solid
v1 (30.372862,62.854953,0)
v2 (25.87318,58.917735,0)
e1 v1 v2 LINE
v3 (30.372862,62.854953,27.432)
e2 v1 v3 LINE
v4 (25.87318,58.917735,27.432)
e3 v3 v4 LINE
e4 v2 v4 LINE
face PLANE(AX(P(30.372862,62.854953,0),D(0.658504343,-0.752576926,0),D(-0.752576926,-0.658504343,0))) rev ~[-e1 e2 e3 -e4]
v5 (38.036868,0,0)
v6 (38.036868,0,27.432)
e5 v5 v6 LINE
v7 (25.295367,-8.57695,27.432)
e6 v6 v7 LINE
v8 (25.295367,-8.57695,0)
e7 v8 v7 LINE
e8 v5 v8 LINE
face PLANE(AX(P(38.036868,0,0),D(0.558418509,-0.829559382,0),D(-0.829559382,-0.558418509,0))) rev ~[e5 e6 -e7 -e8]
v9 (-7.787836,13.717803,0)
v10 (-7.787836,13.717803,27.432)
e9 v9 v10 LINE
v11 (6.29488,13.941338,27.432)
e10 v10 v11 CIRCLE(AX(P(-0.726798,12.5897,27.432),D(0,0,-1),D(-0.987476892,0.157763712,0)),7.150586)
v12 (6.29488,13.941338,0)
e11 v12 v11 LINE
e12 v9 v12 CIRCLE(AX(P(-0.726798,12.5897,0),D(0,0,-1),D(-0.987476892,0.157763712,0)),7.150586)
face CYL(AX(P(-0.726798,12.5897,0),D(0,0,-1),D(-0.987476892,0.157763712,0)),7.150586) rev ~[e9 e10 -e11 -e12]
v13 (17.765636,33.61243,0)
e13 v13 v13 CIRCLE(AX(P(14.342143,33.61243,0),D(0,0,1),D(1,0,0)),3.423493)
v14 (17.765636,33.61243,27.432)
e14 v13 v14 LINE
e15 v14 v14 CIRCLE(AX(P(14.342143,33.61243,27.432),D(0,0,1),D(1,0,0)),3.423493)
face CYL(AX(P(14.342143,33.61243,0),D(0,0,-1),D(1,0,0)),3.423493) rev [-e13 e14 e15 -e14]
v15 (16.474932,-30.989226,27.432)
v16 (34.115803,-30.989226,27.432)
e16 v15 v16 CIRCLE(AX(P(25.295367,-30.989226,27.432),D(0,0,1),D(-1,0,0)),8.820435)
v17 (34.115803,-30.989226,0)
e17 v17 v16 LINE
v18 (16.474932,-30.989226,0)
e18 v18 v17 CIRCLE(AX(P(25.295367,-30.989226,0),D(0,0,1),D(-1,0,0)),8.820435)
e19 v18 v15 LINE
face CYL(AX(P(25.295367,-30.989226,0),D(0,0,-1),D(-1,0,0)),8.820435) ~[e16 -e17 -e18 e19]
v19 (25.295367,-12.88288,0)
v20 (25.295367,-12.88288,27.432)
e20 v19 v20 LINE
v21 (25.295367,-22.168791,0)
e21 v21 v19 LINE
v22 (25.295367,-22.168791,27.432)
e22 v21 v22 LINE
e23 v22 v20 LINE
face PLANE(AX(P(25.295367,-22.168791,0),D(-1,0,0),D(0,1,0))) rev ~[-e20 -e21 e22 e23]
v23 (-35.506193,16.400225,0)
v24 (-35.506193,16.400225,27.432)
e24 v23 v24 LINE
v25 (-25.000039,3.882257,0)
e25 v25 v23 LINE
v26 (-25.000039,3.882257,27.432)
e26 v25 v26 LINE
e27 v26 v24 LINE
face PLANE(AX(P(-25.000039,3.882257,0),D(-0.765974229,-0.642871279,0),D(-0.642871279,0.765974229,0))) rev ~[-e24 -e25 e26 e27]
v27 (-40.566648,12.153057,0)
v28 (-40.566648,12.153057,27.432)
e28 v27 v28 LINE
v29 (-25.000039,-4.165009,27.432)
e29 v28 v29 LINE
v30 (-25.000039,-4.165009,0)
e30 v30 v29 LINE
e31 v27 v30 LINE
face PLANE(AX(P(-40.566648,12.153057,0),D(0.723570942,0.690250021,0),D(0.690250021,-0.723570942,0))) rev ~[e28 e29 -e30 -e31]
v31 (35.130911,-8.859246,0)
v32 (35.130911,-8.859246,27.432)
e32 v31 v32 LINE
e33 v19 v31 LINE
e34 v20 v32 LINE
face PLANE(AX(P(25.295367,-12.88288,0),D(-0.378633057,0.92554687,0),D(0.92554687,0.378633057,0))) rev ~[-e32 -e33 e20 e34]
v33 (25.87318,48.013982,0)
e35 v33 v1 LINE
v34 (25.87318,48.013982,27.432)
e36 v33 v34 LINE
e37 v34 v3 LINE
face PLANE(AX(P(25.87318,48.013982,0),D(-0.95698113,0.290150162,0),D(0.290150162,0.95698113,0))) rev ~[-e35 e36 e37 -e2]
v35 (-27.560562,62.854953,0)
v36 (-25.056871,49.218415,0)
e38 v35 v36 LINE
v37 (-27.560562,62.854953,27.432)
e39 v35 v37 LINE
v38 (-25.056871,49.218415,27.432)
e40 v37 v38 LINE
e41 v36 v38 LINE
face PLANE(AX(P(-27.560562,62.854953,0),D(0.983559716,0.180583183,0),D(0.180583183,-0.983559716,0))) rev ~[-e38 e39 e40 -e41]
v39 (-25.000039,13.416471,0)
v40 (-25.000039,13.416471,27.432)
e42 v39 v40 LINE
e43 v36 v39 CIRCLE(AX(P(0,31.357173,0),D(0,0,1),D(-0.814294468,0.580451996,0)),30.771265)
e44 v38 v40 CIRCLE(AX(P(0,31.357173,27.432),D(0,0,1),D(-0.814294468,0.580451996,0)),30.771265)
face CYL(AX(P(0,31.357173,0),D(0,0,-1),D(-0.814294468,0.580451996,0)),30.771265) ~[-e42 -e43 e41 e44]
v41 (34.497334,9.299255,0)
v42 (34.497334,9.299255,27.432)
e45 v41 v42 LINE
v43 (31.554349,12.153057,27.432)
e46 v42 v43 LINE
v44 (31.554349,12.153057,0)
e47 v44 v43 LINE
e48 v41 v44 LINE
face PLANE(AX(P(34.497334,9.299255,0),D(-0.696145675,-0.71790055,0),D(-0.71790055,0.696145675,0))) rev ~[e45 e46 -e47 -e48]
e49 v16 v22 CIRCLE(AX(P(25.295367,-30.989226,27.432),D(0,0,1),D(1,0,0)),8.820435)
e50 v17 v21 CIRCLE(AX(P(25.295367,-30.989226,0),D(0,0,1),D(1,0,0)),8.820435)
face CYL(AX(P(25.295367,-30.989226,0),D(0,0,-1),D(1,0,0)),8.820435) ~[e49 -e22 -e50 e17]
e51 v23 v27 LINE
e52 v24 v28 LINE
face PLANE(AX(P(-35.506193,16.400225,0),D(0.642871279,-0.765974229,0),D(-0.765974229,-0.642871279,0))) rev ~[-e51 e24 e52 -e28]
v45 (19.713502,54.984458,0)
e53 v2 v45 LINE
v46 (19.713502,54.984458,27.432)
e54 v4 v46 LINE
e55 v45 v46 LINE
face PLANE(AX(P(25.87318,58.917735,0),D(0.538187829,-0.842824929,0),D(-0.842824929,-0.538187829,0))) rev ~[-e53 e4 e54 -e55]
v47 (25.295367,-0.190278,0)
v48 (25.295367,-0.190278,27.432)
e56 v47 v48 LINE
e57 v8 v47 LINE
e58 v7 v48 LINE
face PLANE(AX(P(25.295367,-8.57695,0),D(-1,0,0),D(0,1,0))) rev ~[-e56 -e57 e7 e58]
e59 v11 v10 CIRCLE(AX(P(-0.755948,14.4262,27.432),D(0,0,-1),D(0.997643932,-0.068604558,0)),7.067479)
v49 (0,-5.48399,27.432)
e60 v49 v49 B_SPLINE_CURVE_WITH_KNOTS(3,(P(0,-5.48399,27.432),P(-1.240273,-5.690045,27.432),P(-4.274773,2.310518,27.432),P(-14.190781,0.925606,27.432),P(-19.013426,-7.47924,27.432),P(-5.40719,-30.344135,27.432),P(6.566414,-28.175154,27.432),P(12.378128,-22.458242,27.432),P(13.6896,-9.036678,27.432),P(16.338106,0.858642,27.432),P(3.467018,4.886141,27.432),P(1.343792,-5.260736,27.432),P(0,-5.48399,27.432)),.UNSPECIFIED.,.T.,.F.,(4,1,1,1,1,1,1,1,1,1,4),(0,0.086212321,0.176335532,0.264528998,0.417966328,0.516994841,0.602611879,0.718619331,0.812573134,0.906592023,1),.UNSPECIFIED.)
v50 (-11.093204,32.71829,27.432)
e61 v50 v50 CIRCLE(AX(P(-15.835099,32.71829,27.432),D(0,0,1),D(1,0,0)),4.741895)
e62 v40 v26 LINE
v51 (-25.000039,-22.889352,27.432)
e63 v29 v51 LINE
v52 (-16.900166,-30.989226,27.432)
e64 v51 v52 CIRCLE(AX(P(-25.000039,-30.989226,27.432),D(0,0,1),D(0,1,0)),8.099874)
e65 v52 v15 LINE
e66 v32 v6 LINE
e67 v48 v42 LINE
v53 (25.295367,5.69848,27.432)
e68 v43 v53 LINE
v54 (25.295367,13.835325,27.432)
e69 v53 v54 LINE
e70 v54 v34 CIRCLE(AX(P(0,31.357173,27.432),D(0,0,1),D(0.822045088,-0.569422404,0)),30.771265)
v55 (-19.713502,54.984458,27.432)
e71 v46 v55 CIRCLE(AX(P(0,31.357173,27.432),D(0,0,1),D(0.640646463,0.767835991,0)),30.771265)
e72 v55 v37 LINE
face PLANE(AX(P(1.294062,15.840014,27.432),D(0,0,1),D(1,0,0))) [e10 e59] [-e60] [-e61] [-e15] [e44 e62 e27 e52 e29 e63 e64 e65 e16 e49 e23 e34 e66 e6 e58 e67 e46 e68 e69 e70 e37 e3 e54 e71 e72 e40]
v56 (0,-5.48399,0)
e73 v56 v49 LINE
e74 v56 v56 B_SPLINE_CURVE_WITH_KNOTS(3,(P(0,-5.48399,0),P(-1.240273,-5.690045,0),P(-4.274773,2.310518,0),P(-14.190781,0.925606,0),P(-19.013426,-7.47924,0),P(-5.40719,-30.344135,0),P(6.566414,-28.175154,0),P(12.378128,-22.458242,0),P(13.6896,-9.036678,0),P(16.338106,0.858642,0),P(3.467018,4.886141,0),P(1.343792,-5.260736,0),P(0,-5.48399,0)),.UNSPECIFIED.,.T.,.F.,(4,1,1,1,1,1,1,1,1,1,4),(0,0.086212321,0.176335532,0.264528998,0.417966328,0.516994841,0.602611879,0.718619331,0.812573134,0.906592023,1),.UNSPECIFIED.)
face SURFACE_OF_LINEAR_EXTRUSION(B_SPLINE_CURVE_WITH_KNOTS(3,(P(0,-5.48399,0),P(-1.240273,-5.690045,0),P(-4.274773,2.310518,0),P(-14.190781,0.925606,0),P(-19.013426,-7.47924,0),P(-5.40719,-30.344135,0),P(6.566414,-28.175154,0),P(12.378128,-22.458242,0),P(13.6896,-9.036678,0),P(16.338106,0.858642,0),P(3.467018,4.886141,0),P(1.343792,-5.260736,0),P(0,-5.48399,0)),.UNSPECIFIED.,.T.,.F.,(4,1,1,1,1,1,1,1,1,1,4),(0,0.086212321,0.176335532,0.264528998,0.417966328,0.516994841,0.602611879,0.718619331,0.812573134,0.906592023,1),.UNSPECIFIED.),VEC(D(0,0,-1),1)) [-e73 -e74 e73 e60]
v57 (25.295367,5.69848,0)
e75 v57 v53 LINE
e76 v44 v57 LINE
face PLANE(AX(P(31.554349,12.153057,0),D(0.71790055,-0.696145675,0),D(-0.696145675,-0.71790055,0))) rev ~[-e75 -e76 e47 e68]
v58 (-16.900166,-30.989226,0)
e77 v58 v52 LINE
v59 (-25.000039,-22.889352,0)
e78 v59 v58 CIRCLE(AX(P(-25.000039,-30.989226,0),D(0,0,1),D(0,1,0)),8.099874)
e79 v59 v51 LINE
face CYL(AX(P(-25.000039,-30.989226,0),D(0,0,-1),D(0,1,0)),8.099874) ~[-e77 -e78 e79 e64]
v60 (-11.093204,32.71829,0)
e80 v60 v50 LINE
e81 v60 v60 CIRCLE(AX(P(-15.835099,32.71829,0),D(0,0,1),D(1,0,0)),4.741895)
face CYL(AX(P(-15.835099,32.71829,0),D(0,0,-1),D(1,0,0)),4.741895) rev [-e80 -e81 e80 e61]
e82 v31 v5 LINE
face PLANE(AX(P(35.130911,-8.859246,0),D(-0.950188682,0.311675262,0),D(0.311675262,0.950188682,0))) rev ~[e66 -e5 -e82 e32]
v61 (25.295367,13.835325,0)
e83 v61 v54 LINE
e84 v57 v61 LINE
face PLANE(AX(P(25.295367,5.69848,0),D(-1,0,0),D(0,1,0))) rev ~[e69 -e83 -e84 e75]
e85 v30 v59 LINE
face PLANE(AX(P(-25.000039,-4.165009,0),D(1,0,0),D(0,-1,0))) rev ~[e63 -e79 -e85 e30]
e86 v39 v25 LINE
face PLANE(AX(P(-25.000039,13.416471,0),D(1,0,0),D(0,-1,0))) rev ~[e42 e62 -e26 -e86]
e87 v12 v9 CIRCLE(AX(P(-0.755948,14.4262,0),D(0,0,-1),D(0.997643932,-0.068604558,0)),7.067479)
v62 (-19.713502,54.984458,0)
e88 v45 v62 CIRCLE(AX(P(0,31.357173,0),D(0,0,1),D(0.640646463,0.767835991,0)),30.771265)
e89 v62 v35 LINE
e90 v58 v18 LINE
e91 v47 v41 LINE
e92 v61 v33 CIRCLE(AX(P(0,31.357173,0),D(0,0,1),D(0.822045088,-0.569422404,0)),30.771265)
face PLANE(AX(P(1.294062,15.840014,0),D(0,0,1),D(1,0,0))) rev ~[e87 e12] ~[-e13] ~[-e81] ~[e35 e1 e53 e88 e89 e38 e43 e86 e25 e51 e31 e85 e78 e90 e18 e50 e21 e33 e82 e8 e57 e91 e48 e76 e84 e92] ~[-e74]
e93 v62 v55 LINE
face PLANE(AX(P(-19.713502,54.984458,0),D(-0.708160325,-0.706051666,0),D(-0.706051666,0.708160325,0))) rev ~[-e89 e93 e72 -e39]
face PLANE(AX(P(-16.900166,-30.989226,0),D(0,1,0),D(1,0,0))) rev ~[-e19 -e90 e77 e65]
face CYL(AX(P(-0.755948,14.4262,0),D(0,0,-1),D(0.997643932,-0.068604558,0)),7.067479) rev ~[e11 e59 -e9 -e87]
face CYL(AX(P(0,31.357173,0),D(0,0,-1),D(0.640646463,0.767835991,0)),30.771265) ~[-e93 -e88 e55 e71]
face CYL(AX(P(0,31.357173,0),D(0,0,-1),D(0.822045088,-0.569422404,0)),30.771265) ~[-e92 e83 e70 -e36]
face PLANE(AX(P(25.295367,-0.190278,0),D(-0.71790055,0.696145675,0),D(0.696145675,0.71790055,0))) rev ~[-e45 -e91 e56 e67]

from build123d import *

# Parameters (mm, degrees)
F0_R     = 4.7418950376
F0_R_2   = 3.4234930155
F1_DEPTH = 27.432


# Not quite as in the source:
# - a feature names something its author has since deleted; it is built from what else it names


with BuildPart() as f1:
    # F0 (on Top) → F1 (new body)
    with BuildSketch(Plane.XY):
        with BuildLine():
            Line((25.2953674644, 5.6984800103), (25.2953674644, 13.8353250349))
            ThreePointArc((25.2953674644, 13.8353250349), (30.7668689842, 30.8370384198), (25.8731804788, 48.0139822607))
            Line((25.8731804788, 48.0139822607), (30.3728617728, 62.8549531102))
            Line((30.3728617728, 62.8549531102), (25.8731804788, 58.917734772))
            Line((25.8731804788, 58.917734772), (19.7135022724, 54.9844578476))
            ThreePointArc((19.7135022724, 54.9844578476), (0, 62.1284381568), (-19.7135022724, 54.9844578476))
            Line((-19.7135022724, 54.9844578476), (-27.5605618954, 62.8549531102))
            Line((-27.5605618954, 62.8549531102), (-25.0568710899, 49.2184152222))
            ThreePointArc((-25.0568710899, 49.2184152222), (-30.7712265115, 31.3083269796), (-25.0000394881, 13.4164707571))
            Line((-25.0000394881, 13.4164707571), (-25.0000394881, 10.5883115903))
            Line((-25.0000394881, 10.5883115903), (-25.0000394881, 3.8822568022))
            Line((-25.0000394881, 3.8822568022), (-35.5061925948, 16.4002254605))
            Line((-35.5061925948, 16.4002254605), (-40.5666477737, 12.1530573815))
            Line((-40.5666477737, 12.1530573815), (-25.0000394881, -4.1650086641))
            Line((-25.0000394881, -4.1650086641), (-25.0000394881, -22.8893524268))
            ThreePointArc((-25.0000394881, -22.8893524268), (-19.2725639904, -25.2617504561), (-16.9001659611, -30.9892259538))
            Line((-16.9001659611, -30.9892259538), (16.4749322786, -30.9892259538))
            ThreePointArc((16.4749322786, -30.9892259538), (19.0583779315, -24.7522364209), (25.2953674644, -22.168790768))
            Line((25.2953674644, -22.168790768), (25.2953674644, -12.8828799352))
            Line((25.2953674644, -12.8828799352), (35.1309105754, -8.8592460379))
            Line((35.1309105754, -8.8592460379), (38.0368679762, 0))
            Line((38.0368679762, 0), (25.2953674644, -8.5769504594))
            Line((25.2953674644, -8.5769504594), (25.2953674644, -0.1902780768))
            Line((25.2953674644, -0.1902780768), (34.4973343106, 9.2992545014))
            Line((34.4973343106, 9.2992545014), (31.5543487668, 12.1530573815))
            Line((31.5543487668, 12.1530573815), (25.2953674644, 5.6984800103))
        make_face()
        with BuildLine():
            add(Edge.make_bspline(
                [(0, -5.4839896038), (-1.2402732611, -5.6900448164), (-4.274773093, 2.3105176673), (-14.1907812378, 0.9256060054), (-19.0134260803, -7.4792396235), (-5.4071900703, -30.3441353211), (6.5664135103, -28.1751540776), (12.3781283881, -22.4582417314), (13.6895995956, -9.0366780223), (16.3381064135, 0.8586419268), (3.4670177632, 4.8861409136), (1.3437918836, -5.2607361233), (0, -5.4839896038)],
                knots=[0, 0, 0, 0, 0.0862123206, 0.176335532, 0.2645289981, 0.4179663282, 0.5169948409, 0.6026118794, 0.7186193313, 0.8125731341, 0.9065920226, 1, 1, 1, 1], degree=3))
        make_face(mode=Mode.SUBTRACT)
        with Locations((-15.8350989223, 32.7182896435)):
            Circle(F0_R, mode=Mode.SUBTRACT)
        with BuildLine():
            ThreePointArc((6.2948795967, 13.9413382858), (-0.643780333, 7.3596103039), (-7.7878357843, 13.7178031728))
            ThreePointArc((-7.7878357843, 13.7178031728), (-0.8402846529, 19.7393853242), (6.2948795967, 13.9413382858))
        make_face(mode=Mode.SUBTRACT)
        with Locations((14.3421432003, 33.6124300957)):
            Circle(F0_R_2, mode=Mode.SUBTRACT)
        with BuildLine():
            ThreePointArc((34.1158026503, -30.9892259538), (31.5323569973, -24.7522364209), (25.2953674644, -22.168790768))
            Line((25.2953674644, -22.168790768), (25.2953674644, -30.9892259538))
            Line((25.2953674644, -30.9892259538), (16.4749322786, -30.9892259538))
            ThreePointArc((16.4749322786, -30.9892259538), (25.2953674644, -39.8096611397), (34.1158026503, -30.9892259538))
        make_face()
        with BuildLine():
            Line((25.2953674644, -30.9892259538), (25.2953674644, -22.168790768))
            ThreePointArc((25.2953674644, -22.168790768), (19.0583779315, -24.7522364209), (16.4749322786, -30.9892259538))
            Line((16.4749322786, -30.9892259538), (25.2953674644, -30.9892259538))
        make_face()
        with BuildLine():
            ThreePointArc((-25.0000394881, -22.8893524268), (-30.7275149858, -36.7167014515), (-16.9001659611, -30.9892259538))
            ThreePointArc((-16.9001659611, -30.9892259538), (-19.2725639904, -25.2617504561), (-25.0000394881, -22.8893524268))
        make_face()
    extrude(amount=F1_DEPTH)


solid = f1.part
